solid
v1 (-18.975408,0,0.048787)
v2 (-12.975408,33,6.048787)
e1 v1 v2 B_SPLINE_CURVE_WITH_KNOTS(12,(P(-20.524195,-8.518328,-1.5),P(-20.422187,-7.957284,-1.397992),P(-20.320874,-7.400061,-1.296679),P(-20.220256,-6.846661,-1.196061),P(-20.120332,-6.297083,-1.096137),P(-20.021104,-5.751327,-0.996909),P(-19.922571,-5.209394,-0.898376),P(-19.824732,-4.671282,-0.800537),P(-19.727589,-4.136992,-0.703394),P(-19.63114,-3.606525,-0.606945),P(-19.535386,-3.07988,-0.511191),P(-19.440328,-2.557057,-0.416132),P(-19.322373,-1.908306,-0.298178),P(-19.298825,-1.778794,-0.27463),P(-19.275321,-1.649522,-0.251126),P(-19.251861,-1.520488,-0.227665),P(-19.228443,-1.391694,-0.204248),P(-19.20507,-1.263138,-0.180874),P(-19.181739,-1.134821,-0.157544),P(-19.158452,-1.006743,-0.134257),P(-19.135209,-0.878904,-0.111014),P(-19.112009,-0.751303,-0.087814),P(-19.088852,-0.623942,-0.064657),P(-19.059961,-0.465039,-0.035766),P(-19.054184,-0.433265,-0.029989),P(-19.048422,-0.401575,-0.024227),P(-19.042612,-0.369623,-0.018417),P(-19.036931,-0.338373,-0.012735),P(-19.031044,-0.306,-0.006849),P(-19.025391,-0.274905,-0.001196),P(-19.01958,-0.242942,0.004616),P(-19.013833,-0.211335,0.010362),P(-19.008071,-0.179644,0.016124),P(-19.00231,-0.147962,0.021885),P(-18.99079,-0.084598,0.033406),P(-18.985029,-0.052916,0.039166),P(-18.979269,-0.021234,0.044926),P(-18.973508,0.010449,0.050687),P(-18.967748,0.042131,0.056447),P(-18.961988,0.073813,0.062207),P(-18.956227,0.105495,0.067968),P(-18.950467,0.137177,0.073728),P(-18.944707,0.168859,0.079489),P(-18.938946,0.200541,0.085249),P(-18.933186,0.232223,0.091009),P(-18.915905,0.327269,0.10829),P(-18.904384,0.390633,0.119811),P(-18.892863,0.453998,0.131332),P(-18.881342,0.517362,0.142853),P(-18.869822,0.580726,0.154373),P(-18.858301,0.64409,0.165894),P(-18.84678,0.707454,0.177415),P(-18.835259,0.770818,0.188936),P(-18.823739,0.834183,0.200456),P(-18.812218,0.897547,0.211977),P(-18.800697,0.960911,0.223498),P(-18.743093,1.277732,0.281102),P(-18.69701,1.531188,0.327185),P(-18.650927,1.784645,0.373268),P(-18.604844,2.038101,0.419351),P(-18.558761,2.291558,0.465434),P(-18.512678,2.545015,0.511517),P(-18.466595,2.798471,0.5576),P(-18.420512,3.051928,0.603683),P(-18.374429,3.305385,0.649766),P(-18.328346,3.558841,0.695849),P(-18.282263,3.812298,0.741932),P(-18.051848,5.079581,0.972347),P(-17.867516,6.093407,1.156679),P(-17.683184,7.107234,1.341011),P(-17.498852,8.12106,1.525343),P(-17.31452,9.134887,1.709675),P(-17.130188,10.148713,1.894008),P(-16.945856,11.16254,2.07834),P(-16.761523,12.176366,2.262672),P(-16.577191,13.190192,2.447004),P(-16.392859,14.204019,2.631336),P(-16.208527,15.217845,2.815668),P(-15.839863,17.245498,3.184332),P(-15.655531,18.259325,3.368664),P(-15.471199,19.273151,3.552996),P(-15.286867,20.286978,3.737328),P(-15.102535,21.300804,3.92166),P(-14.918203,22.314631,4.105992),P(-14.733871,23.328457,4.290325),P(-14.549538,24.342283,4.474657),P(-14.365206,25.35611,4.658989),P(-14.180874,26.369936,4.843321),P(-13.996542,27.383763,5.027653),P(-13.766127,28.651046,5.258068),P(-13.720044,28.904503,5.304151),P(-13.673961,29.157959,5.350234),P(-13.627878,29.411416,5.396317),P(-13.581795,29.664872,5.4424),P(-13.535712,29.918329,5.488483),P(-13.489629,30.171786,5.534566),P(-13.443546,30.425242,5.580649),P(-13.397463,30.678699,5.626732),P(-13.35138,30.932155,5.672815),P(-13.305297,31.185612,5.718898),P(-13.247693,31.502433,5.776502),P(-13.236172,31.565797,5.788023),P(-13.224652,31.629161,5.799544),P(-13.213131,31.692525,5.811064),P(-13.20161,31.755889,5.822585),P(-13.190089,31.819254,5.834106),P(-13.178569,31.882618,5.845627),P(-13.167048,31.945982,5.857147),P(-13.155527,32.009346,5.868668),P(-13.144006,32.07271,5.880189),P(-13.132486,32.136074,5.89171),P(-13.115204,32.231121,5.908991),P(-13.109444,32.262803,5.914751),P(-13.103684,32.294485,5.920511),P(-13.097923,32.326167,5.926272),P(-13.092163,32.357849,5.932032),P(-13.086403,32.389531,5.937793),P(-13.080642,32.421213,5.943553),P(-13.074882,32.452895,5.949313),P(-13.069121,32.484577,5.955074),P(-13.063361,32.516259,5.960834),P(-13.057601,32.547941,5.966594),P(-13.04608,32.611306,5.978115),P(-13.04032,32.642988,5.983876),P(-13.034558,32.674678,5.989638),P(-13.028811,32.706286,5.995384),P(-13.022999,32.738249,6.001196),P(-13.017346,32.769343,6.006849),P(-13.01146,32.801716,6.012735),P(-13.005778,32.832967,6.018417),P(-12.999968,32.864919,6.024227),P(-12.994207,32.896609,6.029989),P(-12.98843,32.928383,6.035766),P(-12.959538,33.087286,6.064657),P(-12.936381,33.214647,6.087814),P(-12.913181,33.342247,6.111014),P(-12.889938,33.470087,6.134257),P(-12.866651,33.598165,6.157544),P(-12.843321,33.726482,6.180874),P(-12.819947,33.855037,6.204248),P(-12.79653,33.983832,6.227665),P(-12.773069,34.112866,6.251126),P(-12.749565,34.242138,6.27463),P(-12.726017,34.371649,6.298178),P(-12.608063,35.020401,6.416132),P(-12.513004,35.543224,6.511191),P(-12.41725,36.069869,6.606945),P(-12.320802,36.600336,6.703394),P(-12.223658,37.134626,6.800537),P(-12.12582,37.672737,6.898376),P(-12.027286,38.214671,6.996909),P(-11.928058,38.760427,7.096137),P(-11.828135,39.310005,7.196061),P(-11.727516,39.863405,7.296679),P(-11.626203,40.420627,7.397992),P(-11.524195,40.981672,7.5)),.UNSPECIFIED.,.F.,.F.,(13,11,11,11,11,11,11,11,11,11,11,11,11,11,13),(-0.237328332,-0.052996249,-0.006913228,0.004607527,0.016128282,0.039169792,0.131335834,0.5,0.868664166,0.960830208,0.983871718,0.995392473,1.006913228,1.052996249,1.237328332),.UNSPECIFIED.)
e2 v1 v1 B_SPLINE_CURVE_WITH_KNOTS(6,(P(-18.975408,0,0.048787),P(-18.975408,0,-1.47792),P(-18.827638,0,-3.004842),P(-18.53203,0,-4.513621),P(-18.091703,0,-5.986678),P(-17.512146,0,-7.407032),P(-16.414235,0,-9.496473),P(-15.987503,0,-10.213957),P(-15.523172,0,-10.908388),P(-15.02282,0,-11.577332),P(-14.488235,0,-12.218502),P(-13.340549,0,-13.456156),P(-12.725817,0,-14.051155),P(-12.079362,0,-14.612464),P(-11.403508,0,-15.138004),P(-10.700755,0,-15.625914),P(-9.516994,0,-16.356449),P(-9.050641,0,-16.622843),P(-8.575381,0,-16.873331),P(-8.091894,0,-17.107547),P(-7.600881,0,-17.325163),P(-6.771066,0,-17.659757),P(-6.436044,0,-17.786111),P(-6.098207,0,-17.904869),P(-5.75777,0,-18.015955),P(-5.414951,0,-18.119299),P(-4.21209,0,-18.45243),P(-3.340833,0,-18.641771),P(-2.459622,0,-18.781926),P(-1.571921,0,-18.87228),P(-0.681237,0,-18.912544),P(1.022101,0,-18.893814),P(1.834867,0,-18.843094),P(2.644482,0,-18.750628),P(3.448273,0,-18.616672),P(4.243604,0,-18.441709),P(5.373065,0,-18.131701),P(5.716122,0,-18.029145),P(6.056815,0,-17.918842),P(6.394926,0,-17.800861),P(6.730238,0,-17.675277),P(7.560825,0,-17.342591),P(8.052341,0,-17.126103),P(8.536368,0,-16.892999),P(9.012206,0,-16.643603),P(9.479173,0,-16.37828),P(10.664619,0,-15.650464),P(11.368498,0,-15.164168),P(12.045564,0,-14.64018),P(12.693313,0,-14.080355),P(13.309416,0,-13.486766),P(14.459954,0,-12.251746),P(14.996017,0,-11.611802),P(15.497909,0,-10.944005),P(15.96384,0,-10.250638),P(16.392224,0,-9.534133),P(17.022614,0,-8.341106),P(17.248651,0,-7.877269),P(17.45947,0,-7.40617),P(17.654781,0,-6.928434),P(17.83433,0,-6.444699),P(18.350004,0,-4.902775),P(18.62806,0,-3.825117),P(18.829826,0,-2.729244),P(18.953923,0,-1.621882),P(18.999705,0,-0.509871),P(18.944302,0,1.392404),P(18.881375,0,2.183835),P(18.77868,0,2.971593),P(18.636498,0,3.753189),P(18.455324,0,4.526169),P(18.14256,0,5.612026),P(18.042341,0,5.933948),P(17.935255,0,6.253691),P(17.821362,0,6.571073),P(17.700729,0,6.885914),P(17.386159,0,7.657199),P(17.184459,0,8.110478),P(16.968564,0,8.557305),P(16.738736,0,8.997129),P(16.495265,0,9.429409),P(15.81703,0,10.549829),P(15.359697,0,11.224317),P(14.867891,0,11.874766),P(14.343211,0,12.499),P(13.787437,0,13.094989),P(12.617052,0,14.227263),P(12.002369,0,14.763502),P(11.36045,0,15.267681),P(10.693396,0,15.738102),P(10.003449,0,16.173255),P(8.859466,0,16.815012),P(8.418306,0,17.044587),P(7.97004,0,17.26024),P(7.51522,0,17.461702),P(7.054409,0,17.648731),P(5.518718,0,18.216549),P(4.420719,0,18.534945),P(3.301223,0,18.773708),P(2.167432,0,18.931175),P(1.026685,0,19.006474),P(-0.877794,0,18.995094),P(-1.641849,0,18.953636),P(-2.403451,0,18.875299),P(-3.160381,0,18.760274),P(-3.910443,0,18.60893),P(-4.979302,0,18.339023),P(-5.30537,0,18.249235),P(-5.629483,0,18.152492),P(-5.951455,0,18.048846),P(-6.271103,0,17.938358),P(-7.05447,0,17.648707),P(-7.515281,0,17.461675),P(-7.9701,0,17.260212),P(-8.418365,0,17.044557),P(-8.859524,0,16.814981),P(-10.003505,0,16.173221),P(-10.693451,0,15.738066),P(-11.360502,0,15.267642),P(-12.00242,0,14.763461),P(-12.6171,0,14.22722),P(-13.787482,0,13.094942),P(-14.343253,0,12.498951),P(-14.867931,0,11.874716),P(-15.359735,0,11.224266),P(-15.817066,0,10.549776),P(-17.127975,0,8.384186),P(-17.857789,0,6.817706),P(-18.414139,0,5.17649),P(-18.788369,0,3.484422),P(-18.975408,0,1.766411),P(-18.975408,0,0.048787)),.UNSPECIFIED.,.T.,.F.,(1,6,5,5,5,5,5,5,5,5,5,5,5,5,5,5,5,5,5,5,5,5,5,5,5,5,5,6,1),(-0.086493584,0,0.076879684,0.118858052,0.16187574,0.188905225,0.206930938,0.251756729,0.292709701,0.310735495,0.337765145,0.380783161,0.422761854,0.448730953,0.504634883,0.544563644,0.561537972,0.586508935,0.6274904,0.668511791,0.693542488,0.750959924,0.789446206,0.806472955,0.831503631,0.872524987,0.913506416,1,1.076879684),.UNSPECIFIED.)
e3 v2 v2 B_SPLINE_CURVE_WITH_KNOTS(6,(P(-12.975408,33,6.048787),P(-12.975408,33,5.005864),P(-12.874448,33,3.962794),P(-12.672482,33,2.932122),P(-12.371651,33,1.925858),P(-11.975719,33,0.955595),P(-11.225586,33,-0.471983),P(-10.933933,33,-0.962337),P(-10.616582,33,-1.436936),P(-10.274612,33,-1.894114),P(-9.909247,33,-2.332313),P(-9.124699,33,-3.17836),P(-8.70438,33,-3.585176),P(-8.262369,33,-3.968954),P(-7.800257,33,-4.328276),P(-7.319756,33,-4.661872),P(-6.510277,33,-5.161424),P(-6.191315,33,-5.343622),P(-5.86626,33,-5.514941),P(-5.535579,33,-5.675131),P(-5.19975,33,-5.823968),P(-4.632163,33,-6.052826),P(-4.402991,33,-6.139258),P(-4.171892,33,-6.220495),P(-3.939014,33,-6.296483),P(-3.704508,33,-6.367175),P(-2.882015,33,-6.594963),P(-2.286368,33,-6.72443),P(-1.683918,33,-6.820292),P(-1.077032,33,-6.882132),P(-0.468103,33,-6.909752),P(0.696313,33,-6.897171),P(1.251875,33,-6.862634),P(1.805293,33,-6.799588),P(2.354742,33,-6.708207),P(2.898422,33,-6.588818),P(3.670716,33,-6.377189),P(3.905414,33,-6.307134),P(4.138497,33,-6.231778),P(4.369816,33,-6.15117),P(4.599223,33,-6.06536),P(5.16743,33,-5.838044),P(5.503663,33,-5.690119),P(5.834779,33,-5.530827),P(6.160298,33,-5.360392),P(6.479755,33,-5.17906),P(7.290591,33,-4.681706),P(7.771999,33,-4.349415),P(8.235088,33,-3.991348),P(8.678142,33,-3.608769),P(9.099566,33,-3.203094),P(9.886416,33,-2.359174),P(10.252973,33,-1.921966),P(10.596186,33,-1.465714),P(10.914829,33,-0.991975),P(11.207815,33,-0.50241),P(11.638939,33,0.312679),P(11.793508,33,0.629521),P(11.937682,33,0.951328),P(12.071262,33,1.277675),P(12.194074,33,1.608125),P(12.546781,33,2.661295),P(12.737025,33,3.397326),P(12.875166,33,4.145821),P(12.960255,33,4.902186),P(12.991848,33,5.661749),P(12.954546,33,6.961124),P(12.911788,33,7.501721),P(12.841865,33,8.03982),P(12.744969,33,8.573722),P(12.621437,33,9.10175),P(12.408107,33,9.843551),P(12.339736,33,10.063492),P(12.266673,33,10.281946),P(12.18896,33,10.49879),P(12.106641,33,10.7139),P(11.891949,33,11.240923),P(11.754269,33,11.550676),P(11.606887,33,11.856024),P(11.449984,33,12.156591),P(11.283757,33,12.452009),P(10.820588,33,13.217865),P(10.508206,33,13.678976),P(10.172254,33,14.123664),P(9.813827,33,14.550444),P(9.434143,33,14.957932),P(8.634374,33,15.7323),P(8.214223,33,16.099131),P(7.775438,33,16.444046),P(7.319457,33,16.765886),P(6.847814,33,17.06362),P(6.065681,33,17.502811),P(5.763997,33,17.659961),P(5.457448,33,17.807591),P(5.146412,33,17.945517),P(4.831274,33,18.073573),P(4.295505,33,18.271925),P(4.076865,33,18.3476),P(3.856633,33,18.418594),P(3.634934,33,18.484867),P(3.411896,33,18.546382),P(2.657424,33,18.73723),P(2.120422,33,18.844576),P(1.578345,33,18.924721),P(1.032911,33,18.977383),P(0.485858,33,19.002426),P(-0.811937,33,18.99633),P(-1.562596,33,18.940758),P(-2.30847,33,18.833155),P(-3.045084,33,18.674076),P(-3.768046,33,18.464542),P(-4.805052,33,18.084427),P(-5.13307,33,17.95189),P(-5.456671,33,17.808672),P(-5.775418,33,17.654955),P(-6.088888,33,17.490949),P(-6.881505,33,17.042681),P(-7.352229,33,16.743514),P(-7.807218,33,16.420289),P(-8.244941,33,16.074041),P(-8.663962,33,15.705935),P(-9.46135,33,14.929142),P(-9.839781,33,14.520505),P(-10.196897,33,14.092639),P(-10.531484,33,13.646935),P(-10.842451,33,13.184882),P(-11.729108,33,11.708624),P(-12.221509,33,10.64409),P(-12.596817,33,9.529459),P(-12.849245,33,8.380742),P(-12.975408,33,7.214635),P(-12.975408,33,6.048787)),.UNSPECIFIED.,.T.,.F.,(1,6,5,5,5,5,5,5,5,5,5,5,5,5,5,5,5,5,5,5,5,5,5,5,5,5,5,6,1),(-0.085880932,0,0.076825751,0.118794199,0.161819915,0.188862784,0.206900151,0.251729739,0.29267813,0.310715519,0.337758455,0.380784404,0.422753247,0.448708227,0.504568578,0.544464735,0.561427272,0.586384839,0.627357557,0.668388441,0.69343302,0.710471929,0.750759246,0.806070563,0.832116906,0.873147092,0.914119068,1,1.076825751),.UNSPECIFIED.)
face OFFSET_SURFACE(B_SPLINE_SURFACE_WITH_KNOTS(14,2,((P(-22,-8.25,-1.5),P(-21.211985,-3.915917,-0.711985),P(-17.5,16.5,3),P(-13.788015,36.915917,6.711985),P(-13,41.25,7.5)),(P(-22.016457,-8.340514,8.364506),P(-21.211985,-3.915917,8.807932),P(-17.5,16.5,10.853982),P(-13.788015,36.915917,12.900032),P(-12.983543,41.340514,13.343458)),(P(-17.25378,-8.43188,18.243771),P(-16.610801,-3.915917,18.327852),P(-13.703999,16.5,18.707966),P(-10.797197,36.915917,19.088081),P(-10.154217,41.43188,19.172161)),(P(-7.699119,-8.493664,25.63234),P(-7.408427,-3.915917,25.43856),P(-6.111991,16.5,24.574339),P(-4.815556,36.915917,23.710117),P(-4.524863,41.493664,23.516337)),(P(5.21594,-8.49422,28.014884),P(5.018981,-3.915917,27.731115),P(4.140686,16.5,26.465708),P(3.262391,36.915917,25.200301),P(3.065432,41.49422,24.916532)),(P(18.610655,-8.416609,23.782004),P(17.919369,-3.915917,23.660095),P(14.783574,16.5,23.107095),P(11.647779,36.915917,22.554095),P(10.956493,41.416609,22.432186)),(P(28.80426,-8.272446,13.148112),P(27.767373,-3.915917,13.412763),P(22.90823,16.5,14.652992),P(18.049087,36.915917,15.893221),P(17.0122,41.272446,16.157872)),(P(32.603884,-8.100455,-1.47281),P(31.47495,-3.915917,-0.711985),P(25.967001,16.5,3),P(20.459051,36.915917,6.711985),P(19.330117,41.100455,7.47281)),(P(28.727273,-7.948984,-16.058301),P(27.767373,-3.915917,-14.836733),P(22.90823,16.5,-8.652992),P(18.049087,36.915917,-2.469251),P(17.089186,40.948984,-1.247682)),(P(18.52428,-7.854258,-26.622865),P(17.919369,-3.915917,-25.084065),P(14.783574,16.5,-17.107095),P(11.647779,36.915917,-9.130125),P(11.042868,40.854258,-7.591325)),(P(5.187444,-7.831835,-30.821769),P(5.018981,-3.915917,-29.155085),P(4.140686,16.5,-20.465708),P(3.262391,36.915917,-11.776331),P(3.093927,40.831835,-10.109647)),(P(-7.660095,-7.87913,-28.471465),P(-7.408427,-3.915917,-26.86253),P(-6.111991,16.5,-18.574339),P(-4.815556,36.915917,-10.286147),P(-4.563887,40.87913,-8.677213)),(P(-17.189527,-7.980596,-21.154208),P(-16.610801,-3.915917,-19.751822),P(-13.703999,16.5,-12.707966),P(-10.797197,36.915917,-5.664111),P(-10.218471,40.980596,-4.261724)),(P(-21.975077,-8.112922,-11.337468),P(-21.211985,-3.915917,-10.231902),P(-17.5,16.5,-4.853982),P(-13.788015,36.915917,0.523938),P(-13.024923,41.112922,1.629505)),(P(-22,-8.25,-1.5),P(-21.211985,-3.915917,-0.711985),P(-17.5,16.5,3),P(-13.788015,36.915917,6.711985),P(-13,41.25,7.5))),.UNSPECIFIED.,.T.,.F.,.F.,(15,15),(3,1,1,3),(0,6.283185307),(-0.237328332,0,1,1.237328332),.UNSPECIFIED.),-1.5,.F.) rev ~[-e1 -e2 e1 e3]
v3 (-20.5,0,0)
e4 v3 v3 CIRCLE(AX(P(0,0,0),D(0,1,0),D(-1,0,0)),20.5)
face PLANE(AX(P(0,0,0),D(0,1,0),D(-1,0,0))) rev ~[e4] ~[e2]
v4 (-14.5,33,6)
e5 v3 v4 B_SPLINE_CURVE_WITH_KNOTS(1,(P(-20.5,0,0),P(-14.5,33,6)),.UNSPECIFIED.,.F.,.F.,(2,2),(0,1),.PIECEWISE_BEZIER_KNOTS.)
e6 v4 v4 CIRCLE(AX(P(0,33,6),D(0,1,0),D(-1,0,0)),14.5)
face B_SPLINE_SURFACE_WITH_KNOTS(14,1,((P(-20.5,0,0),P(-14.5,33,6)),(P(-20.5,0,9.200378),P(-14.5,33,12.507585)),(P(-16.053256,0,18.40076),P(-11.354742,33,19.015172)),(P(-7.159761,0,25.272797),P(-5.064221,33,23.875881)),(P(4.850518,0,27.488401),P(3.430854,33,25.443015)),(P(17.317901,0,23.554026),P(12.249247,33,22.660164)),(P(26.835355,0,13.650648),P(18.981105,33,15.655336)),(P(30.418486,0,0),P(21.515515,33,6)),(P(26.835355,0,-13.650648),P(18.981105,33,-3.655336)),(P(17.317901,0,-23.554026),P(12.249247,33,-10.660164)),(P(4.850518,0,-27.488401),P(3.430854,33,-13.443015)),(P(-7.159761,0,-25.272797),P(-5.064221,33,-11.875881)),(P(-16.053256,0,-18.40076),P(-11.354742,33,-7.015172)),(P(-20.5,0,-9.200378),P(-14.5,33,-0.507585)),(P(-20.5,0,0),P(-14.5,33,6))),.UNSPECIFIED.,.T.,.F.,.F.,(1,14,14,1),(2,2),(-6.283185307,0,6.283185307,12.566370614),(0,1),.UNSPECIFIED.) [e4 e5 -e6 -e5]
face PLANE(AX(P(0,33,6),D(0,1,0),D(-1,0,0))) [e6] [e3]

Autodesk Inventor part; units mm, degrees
ref_plane "YZ Plane" through (0, 0, 0) normal (1, 0, 0) x (0, 1, 0)
ref_plane "XY Plane" through (0, 0, 0) normal (0, 0, 1) x (1, 0, 0)
sketch "Szkic6" plane through (0, 0, 0) normal (0, 1, 0) x (-1, 0, 0)
  circle A0 centre (0, 0) radius 20.5
  dimension "d33" = 41
ref_plane "Płaszczyzna konstrukcyjna1" through (0, 33, 0) normal (0, 1, 0) x (-1, 0, 0)
sketch "Szkic7" plane through (0, 33, 0) normal (0, 1, 0) x (-1, 0, 0)
  circle A0 centre (0, 6) radius 14.5
  line L0 (0, -20.3) -> (0, 20.3) construction
  circle A1 centre (0, 0) radius 20.5 construction
  dimension "d35" = 29
loft "Wyciągnięcie złożone1" add profiles "Szkic6", "Szkic7"
shell "Skorupa1" thickness 1.5 removed faces 2 at (-3.2046, 33, 6.1978) at (-3.5154, 0, 4.1371)
equation "\"d33\" = OD1"
equation "\"d35\" = OD2"
equation "\"d52\" = THK"
equation "\"SzerokośćGięciaPodcięcia\" = Grubość"
equation "\"RozmiarPodcięciaNarożnika\" = 4 * Grubość"
equation "\"PromieńPrzejścia\" = PromieńGięcia"
equation "\"Rozmiar_promienia_Jacobiego\" = PromieńGięcia"
equation "\"Wielk_odstępu\" = Grubość"
equation "\"d2\" = PromieńGięcia"
equation "\"d23\" = PromieńGięcia"
equation "\"OD1\" = 41"
equation "\"OD2\" = 29"
equation "\"L\" = 33"
equation "\"THK\" = 1.5"
equation "\"d34\" = L"
equation "\"Grubość\" = 1.5"
equation "\"PromieńGięcia\" = 3"
properties part number "Redukcja asymetryczna Ø41x29x1,5 L=33" material "304"
